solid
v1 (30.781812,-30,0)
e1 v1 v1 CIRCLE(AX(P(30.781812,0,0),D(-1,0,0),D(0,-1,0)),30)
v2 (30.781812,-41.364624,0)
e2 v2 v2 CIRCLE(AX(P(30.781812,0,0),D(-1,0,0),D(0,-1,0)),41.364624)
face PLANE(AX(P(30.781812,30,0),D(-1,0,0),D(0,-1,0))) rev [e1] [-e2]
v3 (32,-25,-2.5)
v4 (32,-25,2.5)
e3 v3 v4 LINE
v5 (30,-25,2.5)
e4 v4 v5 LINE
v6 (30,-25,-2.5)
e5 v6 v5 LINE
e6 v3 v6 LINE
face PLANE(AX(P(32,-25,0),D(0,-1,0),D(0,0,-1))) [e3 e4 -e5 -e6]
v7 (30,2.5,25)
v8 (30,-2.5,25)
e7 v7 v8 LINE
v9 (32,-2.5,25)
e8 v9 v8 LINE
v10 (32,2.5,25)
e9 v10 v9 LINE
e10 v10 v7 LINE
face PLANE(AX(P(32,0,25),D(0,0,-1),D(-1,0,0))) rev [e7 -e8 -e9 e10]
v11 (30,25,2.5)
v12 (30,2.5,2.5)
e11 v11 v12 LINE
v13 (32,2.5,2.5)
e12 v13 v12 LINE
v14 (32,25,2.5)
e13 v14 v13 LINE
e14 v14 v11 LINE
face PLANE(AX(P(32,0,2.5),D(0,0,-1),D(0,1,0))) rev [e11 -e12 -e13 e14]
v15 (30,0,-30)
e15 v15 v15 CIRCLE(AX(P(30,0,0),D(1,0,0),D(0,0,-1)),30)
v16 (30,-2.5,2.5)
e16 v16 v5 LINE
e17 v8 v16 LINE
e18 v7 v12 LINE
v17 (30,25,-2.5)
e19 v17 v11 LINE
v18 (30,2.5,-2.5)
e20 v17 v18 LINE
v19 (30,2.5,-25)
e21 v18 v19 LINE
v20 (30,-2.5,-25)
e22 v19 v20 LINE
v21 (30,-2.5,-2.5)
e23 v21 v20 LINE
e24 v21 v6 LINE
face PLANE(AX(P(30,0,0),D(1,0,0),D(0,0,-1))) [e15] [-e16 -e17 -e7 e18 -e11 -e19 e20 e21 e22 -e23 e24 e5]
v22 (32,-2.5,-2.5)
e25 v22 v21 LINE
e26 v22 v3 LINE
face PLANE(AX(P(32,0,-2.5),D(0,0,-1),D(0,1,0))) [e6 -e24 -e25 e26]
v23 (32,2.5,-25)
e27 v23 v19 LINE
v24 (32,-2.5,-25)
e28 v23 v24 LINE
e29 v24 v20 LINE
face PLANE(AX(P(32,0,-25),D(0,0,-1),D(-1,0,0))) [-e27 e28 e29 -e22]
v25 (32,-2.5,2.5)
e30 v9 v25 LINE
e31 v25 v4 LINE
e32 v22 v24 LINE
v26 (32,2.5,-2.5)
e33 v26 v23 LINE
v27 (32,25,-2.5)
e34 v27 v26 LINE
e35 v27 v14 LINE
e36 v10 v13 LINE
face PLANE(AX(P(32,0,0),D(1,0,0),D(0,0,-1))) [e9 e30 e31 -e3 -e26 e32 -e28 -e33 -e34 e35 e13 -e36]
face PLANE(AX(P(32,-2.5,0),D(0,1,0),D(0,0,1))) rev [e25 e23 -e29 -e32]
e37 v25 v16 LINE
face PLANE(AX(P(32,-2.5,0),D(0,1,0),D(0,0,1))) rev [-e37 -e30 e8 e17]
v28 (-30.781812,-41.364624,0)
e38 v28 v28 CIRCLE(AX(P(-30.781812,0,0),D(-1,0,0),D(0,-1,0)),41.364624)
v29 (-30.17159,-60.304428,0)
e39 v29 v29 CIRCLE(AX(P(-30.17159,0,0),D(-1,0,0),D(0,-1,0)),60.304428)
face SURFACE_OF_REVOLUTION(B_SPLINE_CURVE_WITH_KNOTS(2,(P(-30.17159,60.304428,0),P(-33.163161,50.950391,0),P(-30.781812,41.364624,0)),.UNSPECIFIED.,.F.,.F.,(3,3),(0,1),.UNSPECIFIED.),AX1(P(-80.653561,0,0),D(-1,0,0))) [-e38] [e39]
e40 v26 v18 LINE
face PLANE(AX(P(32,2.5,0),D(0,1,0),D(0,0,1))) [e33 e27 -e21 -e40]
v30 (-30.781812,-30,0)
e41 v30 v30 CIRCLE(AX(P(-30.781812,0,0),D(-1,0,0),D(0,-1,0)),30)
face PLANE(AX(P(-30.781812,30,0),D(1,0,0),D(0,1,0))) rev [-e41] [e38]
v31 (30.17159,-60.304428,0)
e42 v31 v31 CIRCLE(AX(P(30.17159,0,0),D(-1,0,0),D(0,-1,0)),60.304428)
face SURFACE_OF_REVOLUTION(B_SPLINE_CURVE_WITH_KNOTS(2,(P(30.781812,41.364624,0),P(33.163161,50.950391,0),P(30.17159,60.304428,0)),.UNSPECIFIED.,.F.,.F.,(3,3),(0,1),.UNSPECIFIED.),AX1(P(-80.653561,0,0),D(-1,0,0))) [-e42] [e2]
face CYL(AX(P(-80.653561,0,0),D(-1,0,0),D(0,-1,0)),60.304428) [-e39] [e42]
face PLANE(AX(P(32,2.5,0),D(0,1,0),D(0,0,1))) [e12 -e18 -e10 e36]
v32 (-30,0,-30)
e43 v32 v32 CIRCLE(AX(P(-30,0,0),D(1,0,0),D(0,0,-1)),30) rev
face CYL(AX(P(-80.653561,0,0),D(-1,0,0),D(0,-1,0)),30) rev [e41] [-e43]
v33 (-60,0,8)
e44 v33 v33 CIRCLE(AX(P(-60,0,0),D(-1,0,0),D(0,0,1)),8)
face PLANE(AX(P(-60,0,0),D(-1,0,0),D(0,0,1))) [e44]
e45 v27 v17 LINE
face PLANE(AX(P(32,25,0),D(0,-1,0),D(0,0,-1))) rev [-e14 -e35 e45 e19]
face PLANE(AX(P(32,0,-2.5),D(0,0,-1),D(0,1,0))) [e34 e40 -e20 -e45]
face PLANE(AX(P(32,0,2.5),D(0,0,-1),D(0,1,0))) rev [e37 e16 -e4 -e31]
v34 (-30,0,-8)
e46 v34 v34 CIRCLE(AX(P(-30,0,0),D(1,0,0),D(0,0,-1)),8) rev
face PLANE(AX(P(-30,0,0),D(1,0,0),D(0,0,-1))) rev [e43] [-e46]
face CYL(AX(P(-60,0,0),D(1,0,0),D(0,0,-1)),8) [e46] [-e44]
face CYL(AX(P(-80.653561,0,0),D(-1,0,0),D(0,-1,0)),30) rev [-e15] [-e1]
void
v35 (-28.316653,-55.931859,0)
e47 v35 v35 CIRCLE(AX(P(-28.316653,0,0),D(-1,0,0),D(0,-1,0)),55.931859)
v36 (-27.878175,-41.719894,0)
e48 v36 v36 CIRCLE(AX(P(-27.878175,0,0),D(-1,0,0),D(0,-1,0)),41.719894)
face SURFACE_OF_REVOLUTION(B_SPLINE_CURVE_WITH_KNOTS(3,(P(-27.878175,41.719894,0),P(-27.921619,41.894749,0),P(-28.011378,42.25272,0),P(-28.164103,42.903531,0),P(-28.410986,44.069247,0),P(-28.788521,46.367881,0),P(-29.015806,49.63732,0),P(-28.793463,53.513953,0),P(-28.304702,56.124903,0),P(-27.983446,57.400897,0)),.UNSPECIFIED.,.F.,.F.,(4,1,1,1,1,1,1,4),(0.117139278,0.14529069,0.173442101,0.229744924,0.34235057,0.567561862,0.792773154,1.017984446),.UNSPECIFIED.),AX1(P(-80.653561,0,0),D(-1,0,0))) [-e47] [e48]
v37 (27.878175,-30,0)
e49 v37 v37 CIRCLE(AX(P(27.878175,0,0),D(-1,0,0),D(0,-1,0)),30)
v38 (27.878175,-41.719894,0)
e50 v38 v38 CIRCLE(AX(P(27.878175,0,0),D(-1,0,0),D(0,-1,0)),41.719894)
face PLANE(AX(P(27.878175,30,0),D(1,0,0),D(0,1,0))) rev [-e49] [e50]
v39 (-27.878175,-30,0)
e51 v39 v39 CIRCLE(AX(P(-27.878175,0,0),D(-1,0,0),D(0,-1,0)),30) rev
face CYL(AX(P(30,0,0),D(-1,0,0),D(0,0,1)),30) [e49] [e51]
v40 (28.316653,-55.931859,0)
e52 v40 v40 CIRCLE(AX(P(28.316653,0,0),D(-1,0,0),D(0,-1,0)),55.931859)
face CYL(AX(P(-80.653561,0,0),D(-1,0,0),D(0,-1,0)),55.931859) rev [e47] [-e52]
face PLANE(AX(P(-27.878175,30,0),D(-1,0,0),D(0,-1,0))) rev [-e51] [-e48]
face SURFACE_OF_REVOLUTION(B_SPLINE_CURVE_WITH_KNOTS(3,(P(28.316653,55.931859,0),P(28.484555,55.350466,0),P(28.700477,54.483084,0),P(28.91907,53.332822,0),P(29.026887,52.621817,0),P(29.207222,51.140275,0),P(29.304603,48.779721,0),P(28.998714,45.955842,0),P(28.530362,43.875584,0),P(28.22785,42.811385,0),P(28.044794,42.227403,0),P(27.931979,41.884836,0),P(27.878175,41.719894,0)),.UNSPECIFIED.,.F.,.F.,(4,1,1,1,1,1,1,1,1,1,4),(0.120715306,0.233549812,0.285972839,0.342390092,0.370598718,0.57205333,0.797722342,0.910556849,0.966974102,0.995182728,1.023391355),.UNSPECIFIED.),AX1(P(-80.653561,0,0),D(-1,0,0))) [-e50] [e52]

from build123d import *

# Parameters (mm, degrees)
REVOLVE_1_OUTLINE_W   = 0.355269541
REVOLVE_1_OUTLINE_H   = 0.438478825
REVOLVE_1_OUTLINE_W_2 = 11.364624133
REVOLVE_1_OUTLINE_W_3 = 4.372569082
REVOLVE_1_OUTLINE_H_2 = 55.75634902
REVOLVE_1_OUTLINE_H_3 = 1.854936884
REVOLVE_1_OUTLINE_W_4 = 14.211965544
REVOLVE_1_OUTLINE_H_4 = 0.61022171
SKETCH_2_R            = 30
EXTRUDE_1_DEPTH       = 30
SKETCH_3_R            = 8
EXTRUDE_2_DEPTH       = 30
SKETCH_4_W            = 5
SKETCH_4_H            = 22.5
SKETCH_4_W_2          = 22.5
SKETCH_4_H_2          = 5
EXTRUDE_3_DEPTH       = 2


# Read off the part's stored shape, not the designer's step: 회전1
with BuildPart() as part:
    # 회전1 outline → 회전1 (revolve)
    with BuildSketch(Plane.YX):
        with Locations((41.542258903, -28.097413923)):
            Rectangle(REVOLVE_1_OUTLINE_W, REVOLVE_1_OUTLINE_H)
        with BuildLine():
            add(Edge.make_bspline(
                [(41.719893674, -27.87817451), (41.894749248, -27.921618592), (42.252720208, -28.01137838), (42.873298399, -28.15700866), (43.341279515, -28.256769587), (43.642191366, -28.316653335)],
                knots=[0.117139278, 0.117139278, 0.117139278, 0.117139278, 0.14529069, 0.173442101, 0.224513922, 0.224513922, 0.224513922, 0.224513922], degree=3))
            Line((41.719893674, -27.87817451), (41.719893674, -28.316653335))
            Line((41.719893674, -28.316653335), (43.642191366, -28.316653335))
        make_face()
        with BuildLine():
            add(Edge.make_bspline(
                [(43.642191366, -28.316653335), (43.673012094, -28.322786894), (44.367114713, -28.459908676), (46.367881136, -28.788520691), (49.637320271, -29.015805628), (53.021708434, -28.821695589), (55.131271584, -28.478533008), (55.931859218, -28.316653335)],
                knots=[0.224513922, 0.224513922, 0.224513922, 0.224513922, 0.229744924, 0.34235057, 0.567561862, 0.792773154, 0.932194296, 0.932194296, 0.932194296, 0.932194296], degree=3))
            Line((43.642191366, -28.316653335), (41.719893674, -28.316653335))
            Line((41.719893674, -28.316653335), (41.719893674, -30.171590219))
            Line((41.719893674, -30.171590219), (55.931859218, -30.171590219))
            Line((55.931859218, -30.171590219), (55.931859218, -28.316653335))
        make_face()
        with Locations((35.682312067, -28.097413923)):
            Rectangle(REVOLVE_1_OUTLINE_W_2, REVOLVE_1_OUTLINE_H)
        with Locations((58.118143759, -28.097413923)):
            Rectangle(REVOLVE_1_OUTLINE_W_3, REVOLVE_1_OUTLINE_H)
        with Locations((58.118143759, 0)):
            Rectangle(REVOLVE_1_OUTLINE_W_3, REVOLVE_1_OUTLINE_H_2)
        with BuildLine():
            Line((41.719893674, 28.316653335), (41.719893674, 27.87817451))
            add(Edge.make_bspline(
                [(43.128876316, 28.316653335), (42.973861456, 28.272694047), (42.669494175, 28.183372992), (42.227403007, 28.044794313), (41.884836208, 27.931979132), (41.719893674, 27.87817451)],
                knots=[0.937972384, 0.937972384, 0.937972384, 0.937972384, 0.966974102, 0.995182728, 1.023391355, 1.023391355, 1.023391355, 1.023391355], degree=3))
            Line((43.128876316, 28.316653335), (41.719893674, 28.316653335))
        make_face()
        with Locations((41.542258903, 28.097413923)):
            Rectangle(REVOLVE_1_OUTLINE_W, REVOLVE_1_OUTLINE_H)
        with Locations((41.542258903, -29.244121777)):
            Rectangle(REVOLVE_1_OUTLINE_W, REVOLVE_1_OUTLINE_H_3)
        with Locations((58.118143759, -29.244121777)):
            Rectangle(REVOLVE_1_OUTLINE_W_3, REVOLVE_1_OUTLINE_H_3)
        with Locations((35.682312067, -29.244121777)):
            Rectangle(REVOLVE_1_OUTLINE_W_2, REVOLVE_1_OUTLINE_H_3)
        with Locations((35.682312067, 28.097413923)):
            Rectangle(REVOLVE_1_OUTLINE_W_2, REVOLVE_1_OUTLINE_H)
        with Locations((58.118143759, 28.097413923)):
            Rectangle(REVOLVE_1_OUTLINE_W_3, REVOLVE_1_OUTLINE_H)
        with BuildLine():
            Line((41.719893674, 28.316653335), (43.128876316, 28.316653335))
            add(Edge.make_bspline(
                [(55.931859218, 28.316653335), (55.350466054, 28.484554725), (54.483083768, 28.700477141), (53.332821917, 28.919070087), (52.621816991, 29.026887301), (51.140275095, 29.207221888), (48.779721438, 29.304602769), (45.95584246, 28.998713875), (44.028351242, 28.564756145), (43.275412999, 28.358208372), (43.128876316, 28.316653335)],
                knots=[0.120715306, 0.120715306, 0.120715306, 0.120715306, 0.233549812, 0.285972839, 0.342390092, 0.370598718, 0.57205333, 0.797722342, 0.910556849, 0.937972384, 0.937972384, 0.937972384, 0.937972384], degree=3))
            Line((55.931859218, 28.316653335), (55.931859218, 30.171590219))
            Line((55.931859218, 30.171590219), (41.719893674, 30.171590219))
            Line((41.719893674, 30.171590219), (41.719893674, 28.316653335))
        make_face()
        with Locations((41.542258903, 29.244121777)):
            Rectangle(REVOLVE_1_OUTLINE_W, REVOLVE_1_OUTLINE_H_3)
        with Locations((48.825876446, -30.476701074)):
            Rectangle(REVOLVE_1_OUTLINE_W_4, REVOLVE_1_OUTLINE_H_4)
        with Locations((41.542258903, -30.476701074)):
            Rectangle(REVOLVE_1_OUTLINE_W, REVOLVE_1_OUTLINE_H_4)
        with BuildLine():
            Line((60.3044283, -30.171590219), (55.931859218, -30.171590219))
            Line((55.931859218, -30.171590219), (55.931859218, -30.781811929))
            Line((55.931859218, -30.781811929), (58.176696805, -30.781811929))
            add(Edge.make_bspline(
                [(60.3044283, -30.171590219), (59.242057092, -30.511353598), (58.176696805, -30.781811929)],
                knots=[0, 0, 0, 0.113573553, 0.113573553, 0.113573553], degree=2))
        make_face()
        with Locations((35.682312067, -30.476701074)):
            Rectangle(REVOLVE_1_OUTLINE_W_2, REVOLVE_1_OUTLINE_H_4)
        with Locations((35.682312067, 29.244121777)):
            Rectangle(REVOLVE_1_OUTLINE_W_2, REVOLVE_1_OUTLINE_H_3)
        with Locations((58.118143759, 29.244121777)):
            Rectangle(REVOLVE_1_OUTLINE_W_3, REVOLVE_1_OUTLINE_H_3)
        with Locations((41.542258903, 30.476701074)):
            Rectangle(REVOLVE_1_OUTLINE_W, REVOLVE_1_OUTLINE_H_4)
        with Locations((48.825876446, 30.476701074)):
            Rectangle(REVOLVE_1_OUTLINE_W_4, REVOLVE_1_OUTLINE_H_4)
        with BuildLine():
            Line((55.931859218, -30.781811929), (41.719893674, -30.781811929))
            Line((41.719893674, -30.781811929), (41.719893674, -30.868243844))
            add(Edge.make_bspline(
                [(49.816181075, -31.837257545), (45.788933817, -31.837257541), (41.719893674, -30.868243844)],
                knots=[0.556786778, 0.556786778, 0.556786778, 0.981464752, 0.981464752, 0.981464752], degree=2))
            add(Edge.make_bspline(
                [(55.931859218, -31.274158213), (52.886163188, -31.837257547), (49.816181075, -31.837257545)],
                knots=[0.233053543, 0.233053543, 0.233053543, 0.556786778, 0.556786778, 0.556786778], degree=2))
            Line((55.931859218, -31.274158213), (55.931859218, -30.781811929))
        make_face()
        with BuildLine():
            Line((41.719893674, -30.868243844), (41.719893674, -30.781811929))
            Line((41.719893674, -30.781811929), (41.364624133, -30.781811929))
            add(Edge.make_bspline(
                [(41.719893674, -30.868243844), (41.54229871, -30.825950834), (41.364624133, -30.781811929)],
                knots=[0.981464752, 0.981464752, 0.981464752, 1, 1, 1], degree=2))
        make_face()
        with BuildLine():
            Line((58.176696805, -30.781811929), (55.931859218, -30.781811929))
            Line((55.931859218, -30.781811929), (55.931859218, -31.274158213))
            add(Edge.make_bspline(
                [(58.176696805, -30.781811929), (57.055932041, -31.066335551), (55.931859218, -31.274158213)],
                knots=[0.113573553, 0.113573553, 0.113573553, 0.233053543, 0.233053543, 0.233053543], degree=2))
        make_face()
        with Locations((35.682312067, 30.476701074)):
            Rectangle(REVOLVE_1_OUTLINE_W_2, REVOLVE_1_OUTLINE_H_4)
        with BuildLine():
            Line((55.931859218, 30.781811929), (55.931859218, 30.171590219))
            Line((55.931859218, 30.171590219), (60.3044283, 30.171590219))
            add(Edge.make_bspline(
                [(58.176696805, 30.781811929), (59.242057092, 30.511353598), (60.3044283, 30.171590219)],
                knots=[0.886426447, 0.886426447, 0.886426447, 1, 1, 1], degree=2))
            Line((58.176696805, 30.781811929), (55.931859218, 30.781811929))
        make_face()
        with BuildLine():
            Line((41.364624133, 30.781811929), (41.719893674, 30.781811929))
            Line((41.719893674, 30.781811929), (41.719893674, 30.868243844))
            add(Edge.make_bspline(
                [(41.364624133, 30.781811929), (41.54229871, 30.825950834), (41.719893674, 30.868243844)],
                knots=[0, 0, 0, 0.018535248, 0.018535248, 0.018535248], degree=2))
        make_face()
        with BuildLine():
            Line((41.719893674, 30.868243844), (41.719893674, 30.781811929))
            Line((41.719893674, 30.781811929), (55.931859218, 30.781811929))
            Line((55.931859218, 30.781811929), (55.931859218, 31.274158213))
            add(Edge.make_bspline(
                [(49.816181262, 31.837257545), (52.886163281, 31.83725753), (55.931859218, 31.274158213)],
                knots=[0.443213232, 0.443213232, 0.443213232, 0.766946457, 0.766946457, 0.766946457], degree=2))
            add(Edge.make_bspline(
                [(41.719893674, 30.868243844), (45.788933912, 31.837257564), (49.816181262, 31.837257545)],
                knots=[0.018535248, 0.018535248, 0.018535248, 0.443213232, 0.443213232, 0.443213232], degree=2))
        make_face()
        with BuildLine():
            Line((55.931859218, 31.274158213), (55.931859218, 30.781811929))
            Line((55.931859218, 30.781811929), (58.176696805, 30.781811929))
            add(Edge.make_bspline(
                [(55.931859218, 31.274158213), (57.055932041, 31.066335551), (58.176696805, 30.781811929)],
                knots=[0.766946457, 0.766946457, 0.766946457, 0.886426447, 0.886426447, 0.886426447], degree=2))
        make_face()
    revolve(axis=Axis((0, 0, 0), (1, 0, 0)))

    # 스케치2 → 보스-돌출1 (add, symmetric)
    with BuildSketch(Plane(origin=(0, 0, 0), x_dir=(0, 0, -1), z_dir=(1, 0, 0))):
        with Locations(Location((0, 0, 0), (0, 0, 270))):
            Circle(SKETCH_2_R)
    extrude(amount=EXTRUDE_1_DEPTH, both=True)

    # 스케치3 → 보스-돌출2 (add)
    with BuildSketch(Plane.ZY.offset(30)):
        with Locations(Location((0, 0, 0), (0, 0, 180))):
            Circle(SKETCH_3_R)
    extrude(amount=EXTRUDE_2_DEPTH)

    # 스케치4 → 보스-돌출3 (add)
    with BuildSketch(Plane(origin=(30, 0, 0), x_dir=(0, 0, -1), z_dir=(1, 0, 0))):
        with Locations((0, 13.75)):
            Rectangle(SKETCH_4_W, SKETCH_4_H)
        with Locations((-13.75, 0)):
            Rectangle(SKETCH_4_W_2, SKETCH_4_H_2)
        Rectangle(SKETCH_4_W, SKETCH_4_H_2)
        with Locations((13.75, 0)):
            Rectangle(SKETCH_4_W_2, SKETCH_4_H_2)
        with Locations((0, -13.75)):
            Rectangle(SKETCH_4_W, SKETCH_4_H)
    extrude(amount=EXTRUDE_3_DEPTH)


solid = part.part
